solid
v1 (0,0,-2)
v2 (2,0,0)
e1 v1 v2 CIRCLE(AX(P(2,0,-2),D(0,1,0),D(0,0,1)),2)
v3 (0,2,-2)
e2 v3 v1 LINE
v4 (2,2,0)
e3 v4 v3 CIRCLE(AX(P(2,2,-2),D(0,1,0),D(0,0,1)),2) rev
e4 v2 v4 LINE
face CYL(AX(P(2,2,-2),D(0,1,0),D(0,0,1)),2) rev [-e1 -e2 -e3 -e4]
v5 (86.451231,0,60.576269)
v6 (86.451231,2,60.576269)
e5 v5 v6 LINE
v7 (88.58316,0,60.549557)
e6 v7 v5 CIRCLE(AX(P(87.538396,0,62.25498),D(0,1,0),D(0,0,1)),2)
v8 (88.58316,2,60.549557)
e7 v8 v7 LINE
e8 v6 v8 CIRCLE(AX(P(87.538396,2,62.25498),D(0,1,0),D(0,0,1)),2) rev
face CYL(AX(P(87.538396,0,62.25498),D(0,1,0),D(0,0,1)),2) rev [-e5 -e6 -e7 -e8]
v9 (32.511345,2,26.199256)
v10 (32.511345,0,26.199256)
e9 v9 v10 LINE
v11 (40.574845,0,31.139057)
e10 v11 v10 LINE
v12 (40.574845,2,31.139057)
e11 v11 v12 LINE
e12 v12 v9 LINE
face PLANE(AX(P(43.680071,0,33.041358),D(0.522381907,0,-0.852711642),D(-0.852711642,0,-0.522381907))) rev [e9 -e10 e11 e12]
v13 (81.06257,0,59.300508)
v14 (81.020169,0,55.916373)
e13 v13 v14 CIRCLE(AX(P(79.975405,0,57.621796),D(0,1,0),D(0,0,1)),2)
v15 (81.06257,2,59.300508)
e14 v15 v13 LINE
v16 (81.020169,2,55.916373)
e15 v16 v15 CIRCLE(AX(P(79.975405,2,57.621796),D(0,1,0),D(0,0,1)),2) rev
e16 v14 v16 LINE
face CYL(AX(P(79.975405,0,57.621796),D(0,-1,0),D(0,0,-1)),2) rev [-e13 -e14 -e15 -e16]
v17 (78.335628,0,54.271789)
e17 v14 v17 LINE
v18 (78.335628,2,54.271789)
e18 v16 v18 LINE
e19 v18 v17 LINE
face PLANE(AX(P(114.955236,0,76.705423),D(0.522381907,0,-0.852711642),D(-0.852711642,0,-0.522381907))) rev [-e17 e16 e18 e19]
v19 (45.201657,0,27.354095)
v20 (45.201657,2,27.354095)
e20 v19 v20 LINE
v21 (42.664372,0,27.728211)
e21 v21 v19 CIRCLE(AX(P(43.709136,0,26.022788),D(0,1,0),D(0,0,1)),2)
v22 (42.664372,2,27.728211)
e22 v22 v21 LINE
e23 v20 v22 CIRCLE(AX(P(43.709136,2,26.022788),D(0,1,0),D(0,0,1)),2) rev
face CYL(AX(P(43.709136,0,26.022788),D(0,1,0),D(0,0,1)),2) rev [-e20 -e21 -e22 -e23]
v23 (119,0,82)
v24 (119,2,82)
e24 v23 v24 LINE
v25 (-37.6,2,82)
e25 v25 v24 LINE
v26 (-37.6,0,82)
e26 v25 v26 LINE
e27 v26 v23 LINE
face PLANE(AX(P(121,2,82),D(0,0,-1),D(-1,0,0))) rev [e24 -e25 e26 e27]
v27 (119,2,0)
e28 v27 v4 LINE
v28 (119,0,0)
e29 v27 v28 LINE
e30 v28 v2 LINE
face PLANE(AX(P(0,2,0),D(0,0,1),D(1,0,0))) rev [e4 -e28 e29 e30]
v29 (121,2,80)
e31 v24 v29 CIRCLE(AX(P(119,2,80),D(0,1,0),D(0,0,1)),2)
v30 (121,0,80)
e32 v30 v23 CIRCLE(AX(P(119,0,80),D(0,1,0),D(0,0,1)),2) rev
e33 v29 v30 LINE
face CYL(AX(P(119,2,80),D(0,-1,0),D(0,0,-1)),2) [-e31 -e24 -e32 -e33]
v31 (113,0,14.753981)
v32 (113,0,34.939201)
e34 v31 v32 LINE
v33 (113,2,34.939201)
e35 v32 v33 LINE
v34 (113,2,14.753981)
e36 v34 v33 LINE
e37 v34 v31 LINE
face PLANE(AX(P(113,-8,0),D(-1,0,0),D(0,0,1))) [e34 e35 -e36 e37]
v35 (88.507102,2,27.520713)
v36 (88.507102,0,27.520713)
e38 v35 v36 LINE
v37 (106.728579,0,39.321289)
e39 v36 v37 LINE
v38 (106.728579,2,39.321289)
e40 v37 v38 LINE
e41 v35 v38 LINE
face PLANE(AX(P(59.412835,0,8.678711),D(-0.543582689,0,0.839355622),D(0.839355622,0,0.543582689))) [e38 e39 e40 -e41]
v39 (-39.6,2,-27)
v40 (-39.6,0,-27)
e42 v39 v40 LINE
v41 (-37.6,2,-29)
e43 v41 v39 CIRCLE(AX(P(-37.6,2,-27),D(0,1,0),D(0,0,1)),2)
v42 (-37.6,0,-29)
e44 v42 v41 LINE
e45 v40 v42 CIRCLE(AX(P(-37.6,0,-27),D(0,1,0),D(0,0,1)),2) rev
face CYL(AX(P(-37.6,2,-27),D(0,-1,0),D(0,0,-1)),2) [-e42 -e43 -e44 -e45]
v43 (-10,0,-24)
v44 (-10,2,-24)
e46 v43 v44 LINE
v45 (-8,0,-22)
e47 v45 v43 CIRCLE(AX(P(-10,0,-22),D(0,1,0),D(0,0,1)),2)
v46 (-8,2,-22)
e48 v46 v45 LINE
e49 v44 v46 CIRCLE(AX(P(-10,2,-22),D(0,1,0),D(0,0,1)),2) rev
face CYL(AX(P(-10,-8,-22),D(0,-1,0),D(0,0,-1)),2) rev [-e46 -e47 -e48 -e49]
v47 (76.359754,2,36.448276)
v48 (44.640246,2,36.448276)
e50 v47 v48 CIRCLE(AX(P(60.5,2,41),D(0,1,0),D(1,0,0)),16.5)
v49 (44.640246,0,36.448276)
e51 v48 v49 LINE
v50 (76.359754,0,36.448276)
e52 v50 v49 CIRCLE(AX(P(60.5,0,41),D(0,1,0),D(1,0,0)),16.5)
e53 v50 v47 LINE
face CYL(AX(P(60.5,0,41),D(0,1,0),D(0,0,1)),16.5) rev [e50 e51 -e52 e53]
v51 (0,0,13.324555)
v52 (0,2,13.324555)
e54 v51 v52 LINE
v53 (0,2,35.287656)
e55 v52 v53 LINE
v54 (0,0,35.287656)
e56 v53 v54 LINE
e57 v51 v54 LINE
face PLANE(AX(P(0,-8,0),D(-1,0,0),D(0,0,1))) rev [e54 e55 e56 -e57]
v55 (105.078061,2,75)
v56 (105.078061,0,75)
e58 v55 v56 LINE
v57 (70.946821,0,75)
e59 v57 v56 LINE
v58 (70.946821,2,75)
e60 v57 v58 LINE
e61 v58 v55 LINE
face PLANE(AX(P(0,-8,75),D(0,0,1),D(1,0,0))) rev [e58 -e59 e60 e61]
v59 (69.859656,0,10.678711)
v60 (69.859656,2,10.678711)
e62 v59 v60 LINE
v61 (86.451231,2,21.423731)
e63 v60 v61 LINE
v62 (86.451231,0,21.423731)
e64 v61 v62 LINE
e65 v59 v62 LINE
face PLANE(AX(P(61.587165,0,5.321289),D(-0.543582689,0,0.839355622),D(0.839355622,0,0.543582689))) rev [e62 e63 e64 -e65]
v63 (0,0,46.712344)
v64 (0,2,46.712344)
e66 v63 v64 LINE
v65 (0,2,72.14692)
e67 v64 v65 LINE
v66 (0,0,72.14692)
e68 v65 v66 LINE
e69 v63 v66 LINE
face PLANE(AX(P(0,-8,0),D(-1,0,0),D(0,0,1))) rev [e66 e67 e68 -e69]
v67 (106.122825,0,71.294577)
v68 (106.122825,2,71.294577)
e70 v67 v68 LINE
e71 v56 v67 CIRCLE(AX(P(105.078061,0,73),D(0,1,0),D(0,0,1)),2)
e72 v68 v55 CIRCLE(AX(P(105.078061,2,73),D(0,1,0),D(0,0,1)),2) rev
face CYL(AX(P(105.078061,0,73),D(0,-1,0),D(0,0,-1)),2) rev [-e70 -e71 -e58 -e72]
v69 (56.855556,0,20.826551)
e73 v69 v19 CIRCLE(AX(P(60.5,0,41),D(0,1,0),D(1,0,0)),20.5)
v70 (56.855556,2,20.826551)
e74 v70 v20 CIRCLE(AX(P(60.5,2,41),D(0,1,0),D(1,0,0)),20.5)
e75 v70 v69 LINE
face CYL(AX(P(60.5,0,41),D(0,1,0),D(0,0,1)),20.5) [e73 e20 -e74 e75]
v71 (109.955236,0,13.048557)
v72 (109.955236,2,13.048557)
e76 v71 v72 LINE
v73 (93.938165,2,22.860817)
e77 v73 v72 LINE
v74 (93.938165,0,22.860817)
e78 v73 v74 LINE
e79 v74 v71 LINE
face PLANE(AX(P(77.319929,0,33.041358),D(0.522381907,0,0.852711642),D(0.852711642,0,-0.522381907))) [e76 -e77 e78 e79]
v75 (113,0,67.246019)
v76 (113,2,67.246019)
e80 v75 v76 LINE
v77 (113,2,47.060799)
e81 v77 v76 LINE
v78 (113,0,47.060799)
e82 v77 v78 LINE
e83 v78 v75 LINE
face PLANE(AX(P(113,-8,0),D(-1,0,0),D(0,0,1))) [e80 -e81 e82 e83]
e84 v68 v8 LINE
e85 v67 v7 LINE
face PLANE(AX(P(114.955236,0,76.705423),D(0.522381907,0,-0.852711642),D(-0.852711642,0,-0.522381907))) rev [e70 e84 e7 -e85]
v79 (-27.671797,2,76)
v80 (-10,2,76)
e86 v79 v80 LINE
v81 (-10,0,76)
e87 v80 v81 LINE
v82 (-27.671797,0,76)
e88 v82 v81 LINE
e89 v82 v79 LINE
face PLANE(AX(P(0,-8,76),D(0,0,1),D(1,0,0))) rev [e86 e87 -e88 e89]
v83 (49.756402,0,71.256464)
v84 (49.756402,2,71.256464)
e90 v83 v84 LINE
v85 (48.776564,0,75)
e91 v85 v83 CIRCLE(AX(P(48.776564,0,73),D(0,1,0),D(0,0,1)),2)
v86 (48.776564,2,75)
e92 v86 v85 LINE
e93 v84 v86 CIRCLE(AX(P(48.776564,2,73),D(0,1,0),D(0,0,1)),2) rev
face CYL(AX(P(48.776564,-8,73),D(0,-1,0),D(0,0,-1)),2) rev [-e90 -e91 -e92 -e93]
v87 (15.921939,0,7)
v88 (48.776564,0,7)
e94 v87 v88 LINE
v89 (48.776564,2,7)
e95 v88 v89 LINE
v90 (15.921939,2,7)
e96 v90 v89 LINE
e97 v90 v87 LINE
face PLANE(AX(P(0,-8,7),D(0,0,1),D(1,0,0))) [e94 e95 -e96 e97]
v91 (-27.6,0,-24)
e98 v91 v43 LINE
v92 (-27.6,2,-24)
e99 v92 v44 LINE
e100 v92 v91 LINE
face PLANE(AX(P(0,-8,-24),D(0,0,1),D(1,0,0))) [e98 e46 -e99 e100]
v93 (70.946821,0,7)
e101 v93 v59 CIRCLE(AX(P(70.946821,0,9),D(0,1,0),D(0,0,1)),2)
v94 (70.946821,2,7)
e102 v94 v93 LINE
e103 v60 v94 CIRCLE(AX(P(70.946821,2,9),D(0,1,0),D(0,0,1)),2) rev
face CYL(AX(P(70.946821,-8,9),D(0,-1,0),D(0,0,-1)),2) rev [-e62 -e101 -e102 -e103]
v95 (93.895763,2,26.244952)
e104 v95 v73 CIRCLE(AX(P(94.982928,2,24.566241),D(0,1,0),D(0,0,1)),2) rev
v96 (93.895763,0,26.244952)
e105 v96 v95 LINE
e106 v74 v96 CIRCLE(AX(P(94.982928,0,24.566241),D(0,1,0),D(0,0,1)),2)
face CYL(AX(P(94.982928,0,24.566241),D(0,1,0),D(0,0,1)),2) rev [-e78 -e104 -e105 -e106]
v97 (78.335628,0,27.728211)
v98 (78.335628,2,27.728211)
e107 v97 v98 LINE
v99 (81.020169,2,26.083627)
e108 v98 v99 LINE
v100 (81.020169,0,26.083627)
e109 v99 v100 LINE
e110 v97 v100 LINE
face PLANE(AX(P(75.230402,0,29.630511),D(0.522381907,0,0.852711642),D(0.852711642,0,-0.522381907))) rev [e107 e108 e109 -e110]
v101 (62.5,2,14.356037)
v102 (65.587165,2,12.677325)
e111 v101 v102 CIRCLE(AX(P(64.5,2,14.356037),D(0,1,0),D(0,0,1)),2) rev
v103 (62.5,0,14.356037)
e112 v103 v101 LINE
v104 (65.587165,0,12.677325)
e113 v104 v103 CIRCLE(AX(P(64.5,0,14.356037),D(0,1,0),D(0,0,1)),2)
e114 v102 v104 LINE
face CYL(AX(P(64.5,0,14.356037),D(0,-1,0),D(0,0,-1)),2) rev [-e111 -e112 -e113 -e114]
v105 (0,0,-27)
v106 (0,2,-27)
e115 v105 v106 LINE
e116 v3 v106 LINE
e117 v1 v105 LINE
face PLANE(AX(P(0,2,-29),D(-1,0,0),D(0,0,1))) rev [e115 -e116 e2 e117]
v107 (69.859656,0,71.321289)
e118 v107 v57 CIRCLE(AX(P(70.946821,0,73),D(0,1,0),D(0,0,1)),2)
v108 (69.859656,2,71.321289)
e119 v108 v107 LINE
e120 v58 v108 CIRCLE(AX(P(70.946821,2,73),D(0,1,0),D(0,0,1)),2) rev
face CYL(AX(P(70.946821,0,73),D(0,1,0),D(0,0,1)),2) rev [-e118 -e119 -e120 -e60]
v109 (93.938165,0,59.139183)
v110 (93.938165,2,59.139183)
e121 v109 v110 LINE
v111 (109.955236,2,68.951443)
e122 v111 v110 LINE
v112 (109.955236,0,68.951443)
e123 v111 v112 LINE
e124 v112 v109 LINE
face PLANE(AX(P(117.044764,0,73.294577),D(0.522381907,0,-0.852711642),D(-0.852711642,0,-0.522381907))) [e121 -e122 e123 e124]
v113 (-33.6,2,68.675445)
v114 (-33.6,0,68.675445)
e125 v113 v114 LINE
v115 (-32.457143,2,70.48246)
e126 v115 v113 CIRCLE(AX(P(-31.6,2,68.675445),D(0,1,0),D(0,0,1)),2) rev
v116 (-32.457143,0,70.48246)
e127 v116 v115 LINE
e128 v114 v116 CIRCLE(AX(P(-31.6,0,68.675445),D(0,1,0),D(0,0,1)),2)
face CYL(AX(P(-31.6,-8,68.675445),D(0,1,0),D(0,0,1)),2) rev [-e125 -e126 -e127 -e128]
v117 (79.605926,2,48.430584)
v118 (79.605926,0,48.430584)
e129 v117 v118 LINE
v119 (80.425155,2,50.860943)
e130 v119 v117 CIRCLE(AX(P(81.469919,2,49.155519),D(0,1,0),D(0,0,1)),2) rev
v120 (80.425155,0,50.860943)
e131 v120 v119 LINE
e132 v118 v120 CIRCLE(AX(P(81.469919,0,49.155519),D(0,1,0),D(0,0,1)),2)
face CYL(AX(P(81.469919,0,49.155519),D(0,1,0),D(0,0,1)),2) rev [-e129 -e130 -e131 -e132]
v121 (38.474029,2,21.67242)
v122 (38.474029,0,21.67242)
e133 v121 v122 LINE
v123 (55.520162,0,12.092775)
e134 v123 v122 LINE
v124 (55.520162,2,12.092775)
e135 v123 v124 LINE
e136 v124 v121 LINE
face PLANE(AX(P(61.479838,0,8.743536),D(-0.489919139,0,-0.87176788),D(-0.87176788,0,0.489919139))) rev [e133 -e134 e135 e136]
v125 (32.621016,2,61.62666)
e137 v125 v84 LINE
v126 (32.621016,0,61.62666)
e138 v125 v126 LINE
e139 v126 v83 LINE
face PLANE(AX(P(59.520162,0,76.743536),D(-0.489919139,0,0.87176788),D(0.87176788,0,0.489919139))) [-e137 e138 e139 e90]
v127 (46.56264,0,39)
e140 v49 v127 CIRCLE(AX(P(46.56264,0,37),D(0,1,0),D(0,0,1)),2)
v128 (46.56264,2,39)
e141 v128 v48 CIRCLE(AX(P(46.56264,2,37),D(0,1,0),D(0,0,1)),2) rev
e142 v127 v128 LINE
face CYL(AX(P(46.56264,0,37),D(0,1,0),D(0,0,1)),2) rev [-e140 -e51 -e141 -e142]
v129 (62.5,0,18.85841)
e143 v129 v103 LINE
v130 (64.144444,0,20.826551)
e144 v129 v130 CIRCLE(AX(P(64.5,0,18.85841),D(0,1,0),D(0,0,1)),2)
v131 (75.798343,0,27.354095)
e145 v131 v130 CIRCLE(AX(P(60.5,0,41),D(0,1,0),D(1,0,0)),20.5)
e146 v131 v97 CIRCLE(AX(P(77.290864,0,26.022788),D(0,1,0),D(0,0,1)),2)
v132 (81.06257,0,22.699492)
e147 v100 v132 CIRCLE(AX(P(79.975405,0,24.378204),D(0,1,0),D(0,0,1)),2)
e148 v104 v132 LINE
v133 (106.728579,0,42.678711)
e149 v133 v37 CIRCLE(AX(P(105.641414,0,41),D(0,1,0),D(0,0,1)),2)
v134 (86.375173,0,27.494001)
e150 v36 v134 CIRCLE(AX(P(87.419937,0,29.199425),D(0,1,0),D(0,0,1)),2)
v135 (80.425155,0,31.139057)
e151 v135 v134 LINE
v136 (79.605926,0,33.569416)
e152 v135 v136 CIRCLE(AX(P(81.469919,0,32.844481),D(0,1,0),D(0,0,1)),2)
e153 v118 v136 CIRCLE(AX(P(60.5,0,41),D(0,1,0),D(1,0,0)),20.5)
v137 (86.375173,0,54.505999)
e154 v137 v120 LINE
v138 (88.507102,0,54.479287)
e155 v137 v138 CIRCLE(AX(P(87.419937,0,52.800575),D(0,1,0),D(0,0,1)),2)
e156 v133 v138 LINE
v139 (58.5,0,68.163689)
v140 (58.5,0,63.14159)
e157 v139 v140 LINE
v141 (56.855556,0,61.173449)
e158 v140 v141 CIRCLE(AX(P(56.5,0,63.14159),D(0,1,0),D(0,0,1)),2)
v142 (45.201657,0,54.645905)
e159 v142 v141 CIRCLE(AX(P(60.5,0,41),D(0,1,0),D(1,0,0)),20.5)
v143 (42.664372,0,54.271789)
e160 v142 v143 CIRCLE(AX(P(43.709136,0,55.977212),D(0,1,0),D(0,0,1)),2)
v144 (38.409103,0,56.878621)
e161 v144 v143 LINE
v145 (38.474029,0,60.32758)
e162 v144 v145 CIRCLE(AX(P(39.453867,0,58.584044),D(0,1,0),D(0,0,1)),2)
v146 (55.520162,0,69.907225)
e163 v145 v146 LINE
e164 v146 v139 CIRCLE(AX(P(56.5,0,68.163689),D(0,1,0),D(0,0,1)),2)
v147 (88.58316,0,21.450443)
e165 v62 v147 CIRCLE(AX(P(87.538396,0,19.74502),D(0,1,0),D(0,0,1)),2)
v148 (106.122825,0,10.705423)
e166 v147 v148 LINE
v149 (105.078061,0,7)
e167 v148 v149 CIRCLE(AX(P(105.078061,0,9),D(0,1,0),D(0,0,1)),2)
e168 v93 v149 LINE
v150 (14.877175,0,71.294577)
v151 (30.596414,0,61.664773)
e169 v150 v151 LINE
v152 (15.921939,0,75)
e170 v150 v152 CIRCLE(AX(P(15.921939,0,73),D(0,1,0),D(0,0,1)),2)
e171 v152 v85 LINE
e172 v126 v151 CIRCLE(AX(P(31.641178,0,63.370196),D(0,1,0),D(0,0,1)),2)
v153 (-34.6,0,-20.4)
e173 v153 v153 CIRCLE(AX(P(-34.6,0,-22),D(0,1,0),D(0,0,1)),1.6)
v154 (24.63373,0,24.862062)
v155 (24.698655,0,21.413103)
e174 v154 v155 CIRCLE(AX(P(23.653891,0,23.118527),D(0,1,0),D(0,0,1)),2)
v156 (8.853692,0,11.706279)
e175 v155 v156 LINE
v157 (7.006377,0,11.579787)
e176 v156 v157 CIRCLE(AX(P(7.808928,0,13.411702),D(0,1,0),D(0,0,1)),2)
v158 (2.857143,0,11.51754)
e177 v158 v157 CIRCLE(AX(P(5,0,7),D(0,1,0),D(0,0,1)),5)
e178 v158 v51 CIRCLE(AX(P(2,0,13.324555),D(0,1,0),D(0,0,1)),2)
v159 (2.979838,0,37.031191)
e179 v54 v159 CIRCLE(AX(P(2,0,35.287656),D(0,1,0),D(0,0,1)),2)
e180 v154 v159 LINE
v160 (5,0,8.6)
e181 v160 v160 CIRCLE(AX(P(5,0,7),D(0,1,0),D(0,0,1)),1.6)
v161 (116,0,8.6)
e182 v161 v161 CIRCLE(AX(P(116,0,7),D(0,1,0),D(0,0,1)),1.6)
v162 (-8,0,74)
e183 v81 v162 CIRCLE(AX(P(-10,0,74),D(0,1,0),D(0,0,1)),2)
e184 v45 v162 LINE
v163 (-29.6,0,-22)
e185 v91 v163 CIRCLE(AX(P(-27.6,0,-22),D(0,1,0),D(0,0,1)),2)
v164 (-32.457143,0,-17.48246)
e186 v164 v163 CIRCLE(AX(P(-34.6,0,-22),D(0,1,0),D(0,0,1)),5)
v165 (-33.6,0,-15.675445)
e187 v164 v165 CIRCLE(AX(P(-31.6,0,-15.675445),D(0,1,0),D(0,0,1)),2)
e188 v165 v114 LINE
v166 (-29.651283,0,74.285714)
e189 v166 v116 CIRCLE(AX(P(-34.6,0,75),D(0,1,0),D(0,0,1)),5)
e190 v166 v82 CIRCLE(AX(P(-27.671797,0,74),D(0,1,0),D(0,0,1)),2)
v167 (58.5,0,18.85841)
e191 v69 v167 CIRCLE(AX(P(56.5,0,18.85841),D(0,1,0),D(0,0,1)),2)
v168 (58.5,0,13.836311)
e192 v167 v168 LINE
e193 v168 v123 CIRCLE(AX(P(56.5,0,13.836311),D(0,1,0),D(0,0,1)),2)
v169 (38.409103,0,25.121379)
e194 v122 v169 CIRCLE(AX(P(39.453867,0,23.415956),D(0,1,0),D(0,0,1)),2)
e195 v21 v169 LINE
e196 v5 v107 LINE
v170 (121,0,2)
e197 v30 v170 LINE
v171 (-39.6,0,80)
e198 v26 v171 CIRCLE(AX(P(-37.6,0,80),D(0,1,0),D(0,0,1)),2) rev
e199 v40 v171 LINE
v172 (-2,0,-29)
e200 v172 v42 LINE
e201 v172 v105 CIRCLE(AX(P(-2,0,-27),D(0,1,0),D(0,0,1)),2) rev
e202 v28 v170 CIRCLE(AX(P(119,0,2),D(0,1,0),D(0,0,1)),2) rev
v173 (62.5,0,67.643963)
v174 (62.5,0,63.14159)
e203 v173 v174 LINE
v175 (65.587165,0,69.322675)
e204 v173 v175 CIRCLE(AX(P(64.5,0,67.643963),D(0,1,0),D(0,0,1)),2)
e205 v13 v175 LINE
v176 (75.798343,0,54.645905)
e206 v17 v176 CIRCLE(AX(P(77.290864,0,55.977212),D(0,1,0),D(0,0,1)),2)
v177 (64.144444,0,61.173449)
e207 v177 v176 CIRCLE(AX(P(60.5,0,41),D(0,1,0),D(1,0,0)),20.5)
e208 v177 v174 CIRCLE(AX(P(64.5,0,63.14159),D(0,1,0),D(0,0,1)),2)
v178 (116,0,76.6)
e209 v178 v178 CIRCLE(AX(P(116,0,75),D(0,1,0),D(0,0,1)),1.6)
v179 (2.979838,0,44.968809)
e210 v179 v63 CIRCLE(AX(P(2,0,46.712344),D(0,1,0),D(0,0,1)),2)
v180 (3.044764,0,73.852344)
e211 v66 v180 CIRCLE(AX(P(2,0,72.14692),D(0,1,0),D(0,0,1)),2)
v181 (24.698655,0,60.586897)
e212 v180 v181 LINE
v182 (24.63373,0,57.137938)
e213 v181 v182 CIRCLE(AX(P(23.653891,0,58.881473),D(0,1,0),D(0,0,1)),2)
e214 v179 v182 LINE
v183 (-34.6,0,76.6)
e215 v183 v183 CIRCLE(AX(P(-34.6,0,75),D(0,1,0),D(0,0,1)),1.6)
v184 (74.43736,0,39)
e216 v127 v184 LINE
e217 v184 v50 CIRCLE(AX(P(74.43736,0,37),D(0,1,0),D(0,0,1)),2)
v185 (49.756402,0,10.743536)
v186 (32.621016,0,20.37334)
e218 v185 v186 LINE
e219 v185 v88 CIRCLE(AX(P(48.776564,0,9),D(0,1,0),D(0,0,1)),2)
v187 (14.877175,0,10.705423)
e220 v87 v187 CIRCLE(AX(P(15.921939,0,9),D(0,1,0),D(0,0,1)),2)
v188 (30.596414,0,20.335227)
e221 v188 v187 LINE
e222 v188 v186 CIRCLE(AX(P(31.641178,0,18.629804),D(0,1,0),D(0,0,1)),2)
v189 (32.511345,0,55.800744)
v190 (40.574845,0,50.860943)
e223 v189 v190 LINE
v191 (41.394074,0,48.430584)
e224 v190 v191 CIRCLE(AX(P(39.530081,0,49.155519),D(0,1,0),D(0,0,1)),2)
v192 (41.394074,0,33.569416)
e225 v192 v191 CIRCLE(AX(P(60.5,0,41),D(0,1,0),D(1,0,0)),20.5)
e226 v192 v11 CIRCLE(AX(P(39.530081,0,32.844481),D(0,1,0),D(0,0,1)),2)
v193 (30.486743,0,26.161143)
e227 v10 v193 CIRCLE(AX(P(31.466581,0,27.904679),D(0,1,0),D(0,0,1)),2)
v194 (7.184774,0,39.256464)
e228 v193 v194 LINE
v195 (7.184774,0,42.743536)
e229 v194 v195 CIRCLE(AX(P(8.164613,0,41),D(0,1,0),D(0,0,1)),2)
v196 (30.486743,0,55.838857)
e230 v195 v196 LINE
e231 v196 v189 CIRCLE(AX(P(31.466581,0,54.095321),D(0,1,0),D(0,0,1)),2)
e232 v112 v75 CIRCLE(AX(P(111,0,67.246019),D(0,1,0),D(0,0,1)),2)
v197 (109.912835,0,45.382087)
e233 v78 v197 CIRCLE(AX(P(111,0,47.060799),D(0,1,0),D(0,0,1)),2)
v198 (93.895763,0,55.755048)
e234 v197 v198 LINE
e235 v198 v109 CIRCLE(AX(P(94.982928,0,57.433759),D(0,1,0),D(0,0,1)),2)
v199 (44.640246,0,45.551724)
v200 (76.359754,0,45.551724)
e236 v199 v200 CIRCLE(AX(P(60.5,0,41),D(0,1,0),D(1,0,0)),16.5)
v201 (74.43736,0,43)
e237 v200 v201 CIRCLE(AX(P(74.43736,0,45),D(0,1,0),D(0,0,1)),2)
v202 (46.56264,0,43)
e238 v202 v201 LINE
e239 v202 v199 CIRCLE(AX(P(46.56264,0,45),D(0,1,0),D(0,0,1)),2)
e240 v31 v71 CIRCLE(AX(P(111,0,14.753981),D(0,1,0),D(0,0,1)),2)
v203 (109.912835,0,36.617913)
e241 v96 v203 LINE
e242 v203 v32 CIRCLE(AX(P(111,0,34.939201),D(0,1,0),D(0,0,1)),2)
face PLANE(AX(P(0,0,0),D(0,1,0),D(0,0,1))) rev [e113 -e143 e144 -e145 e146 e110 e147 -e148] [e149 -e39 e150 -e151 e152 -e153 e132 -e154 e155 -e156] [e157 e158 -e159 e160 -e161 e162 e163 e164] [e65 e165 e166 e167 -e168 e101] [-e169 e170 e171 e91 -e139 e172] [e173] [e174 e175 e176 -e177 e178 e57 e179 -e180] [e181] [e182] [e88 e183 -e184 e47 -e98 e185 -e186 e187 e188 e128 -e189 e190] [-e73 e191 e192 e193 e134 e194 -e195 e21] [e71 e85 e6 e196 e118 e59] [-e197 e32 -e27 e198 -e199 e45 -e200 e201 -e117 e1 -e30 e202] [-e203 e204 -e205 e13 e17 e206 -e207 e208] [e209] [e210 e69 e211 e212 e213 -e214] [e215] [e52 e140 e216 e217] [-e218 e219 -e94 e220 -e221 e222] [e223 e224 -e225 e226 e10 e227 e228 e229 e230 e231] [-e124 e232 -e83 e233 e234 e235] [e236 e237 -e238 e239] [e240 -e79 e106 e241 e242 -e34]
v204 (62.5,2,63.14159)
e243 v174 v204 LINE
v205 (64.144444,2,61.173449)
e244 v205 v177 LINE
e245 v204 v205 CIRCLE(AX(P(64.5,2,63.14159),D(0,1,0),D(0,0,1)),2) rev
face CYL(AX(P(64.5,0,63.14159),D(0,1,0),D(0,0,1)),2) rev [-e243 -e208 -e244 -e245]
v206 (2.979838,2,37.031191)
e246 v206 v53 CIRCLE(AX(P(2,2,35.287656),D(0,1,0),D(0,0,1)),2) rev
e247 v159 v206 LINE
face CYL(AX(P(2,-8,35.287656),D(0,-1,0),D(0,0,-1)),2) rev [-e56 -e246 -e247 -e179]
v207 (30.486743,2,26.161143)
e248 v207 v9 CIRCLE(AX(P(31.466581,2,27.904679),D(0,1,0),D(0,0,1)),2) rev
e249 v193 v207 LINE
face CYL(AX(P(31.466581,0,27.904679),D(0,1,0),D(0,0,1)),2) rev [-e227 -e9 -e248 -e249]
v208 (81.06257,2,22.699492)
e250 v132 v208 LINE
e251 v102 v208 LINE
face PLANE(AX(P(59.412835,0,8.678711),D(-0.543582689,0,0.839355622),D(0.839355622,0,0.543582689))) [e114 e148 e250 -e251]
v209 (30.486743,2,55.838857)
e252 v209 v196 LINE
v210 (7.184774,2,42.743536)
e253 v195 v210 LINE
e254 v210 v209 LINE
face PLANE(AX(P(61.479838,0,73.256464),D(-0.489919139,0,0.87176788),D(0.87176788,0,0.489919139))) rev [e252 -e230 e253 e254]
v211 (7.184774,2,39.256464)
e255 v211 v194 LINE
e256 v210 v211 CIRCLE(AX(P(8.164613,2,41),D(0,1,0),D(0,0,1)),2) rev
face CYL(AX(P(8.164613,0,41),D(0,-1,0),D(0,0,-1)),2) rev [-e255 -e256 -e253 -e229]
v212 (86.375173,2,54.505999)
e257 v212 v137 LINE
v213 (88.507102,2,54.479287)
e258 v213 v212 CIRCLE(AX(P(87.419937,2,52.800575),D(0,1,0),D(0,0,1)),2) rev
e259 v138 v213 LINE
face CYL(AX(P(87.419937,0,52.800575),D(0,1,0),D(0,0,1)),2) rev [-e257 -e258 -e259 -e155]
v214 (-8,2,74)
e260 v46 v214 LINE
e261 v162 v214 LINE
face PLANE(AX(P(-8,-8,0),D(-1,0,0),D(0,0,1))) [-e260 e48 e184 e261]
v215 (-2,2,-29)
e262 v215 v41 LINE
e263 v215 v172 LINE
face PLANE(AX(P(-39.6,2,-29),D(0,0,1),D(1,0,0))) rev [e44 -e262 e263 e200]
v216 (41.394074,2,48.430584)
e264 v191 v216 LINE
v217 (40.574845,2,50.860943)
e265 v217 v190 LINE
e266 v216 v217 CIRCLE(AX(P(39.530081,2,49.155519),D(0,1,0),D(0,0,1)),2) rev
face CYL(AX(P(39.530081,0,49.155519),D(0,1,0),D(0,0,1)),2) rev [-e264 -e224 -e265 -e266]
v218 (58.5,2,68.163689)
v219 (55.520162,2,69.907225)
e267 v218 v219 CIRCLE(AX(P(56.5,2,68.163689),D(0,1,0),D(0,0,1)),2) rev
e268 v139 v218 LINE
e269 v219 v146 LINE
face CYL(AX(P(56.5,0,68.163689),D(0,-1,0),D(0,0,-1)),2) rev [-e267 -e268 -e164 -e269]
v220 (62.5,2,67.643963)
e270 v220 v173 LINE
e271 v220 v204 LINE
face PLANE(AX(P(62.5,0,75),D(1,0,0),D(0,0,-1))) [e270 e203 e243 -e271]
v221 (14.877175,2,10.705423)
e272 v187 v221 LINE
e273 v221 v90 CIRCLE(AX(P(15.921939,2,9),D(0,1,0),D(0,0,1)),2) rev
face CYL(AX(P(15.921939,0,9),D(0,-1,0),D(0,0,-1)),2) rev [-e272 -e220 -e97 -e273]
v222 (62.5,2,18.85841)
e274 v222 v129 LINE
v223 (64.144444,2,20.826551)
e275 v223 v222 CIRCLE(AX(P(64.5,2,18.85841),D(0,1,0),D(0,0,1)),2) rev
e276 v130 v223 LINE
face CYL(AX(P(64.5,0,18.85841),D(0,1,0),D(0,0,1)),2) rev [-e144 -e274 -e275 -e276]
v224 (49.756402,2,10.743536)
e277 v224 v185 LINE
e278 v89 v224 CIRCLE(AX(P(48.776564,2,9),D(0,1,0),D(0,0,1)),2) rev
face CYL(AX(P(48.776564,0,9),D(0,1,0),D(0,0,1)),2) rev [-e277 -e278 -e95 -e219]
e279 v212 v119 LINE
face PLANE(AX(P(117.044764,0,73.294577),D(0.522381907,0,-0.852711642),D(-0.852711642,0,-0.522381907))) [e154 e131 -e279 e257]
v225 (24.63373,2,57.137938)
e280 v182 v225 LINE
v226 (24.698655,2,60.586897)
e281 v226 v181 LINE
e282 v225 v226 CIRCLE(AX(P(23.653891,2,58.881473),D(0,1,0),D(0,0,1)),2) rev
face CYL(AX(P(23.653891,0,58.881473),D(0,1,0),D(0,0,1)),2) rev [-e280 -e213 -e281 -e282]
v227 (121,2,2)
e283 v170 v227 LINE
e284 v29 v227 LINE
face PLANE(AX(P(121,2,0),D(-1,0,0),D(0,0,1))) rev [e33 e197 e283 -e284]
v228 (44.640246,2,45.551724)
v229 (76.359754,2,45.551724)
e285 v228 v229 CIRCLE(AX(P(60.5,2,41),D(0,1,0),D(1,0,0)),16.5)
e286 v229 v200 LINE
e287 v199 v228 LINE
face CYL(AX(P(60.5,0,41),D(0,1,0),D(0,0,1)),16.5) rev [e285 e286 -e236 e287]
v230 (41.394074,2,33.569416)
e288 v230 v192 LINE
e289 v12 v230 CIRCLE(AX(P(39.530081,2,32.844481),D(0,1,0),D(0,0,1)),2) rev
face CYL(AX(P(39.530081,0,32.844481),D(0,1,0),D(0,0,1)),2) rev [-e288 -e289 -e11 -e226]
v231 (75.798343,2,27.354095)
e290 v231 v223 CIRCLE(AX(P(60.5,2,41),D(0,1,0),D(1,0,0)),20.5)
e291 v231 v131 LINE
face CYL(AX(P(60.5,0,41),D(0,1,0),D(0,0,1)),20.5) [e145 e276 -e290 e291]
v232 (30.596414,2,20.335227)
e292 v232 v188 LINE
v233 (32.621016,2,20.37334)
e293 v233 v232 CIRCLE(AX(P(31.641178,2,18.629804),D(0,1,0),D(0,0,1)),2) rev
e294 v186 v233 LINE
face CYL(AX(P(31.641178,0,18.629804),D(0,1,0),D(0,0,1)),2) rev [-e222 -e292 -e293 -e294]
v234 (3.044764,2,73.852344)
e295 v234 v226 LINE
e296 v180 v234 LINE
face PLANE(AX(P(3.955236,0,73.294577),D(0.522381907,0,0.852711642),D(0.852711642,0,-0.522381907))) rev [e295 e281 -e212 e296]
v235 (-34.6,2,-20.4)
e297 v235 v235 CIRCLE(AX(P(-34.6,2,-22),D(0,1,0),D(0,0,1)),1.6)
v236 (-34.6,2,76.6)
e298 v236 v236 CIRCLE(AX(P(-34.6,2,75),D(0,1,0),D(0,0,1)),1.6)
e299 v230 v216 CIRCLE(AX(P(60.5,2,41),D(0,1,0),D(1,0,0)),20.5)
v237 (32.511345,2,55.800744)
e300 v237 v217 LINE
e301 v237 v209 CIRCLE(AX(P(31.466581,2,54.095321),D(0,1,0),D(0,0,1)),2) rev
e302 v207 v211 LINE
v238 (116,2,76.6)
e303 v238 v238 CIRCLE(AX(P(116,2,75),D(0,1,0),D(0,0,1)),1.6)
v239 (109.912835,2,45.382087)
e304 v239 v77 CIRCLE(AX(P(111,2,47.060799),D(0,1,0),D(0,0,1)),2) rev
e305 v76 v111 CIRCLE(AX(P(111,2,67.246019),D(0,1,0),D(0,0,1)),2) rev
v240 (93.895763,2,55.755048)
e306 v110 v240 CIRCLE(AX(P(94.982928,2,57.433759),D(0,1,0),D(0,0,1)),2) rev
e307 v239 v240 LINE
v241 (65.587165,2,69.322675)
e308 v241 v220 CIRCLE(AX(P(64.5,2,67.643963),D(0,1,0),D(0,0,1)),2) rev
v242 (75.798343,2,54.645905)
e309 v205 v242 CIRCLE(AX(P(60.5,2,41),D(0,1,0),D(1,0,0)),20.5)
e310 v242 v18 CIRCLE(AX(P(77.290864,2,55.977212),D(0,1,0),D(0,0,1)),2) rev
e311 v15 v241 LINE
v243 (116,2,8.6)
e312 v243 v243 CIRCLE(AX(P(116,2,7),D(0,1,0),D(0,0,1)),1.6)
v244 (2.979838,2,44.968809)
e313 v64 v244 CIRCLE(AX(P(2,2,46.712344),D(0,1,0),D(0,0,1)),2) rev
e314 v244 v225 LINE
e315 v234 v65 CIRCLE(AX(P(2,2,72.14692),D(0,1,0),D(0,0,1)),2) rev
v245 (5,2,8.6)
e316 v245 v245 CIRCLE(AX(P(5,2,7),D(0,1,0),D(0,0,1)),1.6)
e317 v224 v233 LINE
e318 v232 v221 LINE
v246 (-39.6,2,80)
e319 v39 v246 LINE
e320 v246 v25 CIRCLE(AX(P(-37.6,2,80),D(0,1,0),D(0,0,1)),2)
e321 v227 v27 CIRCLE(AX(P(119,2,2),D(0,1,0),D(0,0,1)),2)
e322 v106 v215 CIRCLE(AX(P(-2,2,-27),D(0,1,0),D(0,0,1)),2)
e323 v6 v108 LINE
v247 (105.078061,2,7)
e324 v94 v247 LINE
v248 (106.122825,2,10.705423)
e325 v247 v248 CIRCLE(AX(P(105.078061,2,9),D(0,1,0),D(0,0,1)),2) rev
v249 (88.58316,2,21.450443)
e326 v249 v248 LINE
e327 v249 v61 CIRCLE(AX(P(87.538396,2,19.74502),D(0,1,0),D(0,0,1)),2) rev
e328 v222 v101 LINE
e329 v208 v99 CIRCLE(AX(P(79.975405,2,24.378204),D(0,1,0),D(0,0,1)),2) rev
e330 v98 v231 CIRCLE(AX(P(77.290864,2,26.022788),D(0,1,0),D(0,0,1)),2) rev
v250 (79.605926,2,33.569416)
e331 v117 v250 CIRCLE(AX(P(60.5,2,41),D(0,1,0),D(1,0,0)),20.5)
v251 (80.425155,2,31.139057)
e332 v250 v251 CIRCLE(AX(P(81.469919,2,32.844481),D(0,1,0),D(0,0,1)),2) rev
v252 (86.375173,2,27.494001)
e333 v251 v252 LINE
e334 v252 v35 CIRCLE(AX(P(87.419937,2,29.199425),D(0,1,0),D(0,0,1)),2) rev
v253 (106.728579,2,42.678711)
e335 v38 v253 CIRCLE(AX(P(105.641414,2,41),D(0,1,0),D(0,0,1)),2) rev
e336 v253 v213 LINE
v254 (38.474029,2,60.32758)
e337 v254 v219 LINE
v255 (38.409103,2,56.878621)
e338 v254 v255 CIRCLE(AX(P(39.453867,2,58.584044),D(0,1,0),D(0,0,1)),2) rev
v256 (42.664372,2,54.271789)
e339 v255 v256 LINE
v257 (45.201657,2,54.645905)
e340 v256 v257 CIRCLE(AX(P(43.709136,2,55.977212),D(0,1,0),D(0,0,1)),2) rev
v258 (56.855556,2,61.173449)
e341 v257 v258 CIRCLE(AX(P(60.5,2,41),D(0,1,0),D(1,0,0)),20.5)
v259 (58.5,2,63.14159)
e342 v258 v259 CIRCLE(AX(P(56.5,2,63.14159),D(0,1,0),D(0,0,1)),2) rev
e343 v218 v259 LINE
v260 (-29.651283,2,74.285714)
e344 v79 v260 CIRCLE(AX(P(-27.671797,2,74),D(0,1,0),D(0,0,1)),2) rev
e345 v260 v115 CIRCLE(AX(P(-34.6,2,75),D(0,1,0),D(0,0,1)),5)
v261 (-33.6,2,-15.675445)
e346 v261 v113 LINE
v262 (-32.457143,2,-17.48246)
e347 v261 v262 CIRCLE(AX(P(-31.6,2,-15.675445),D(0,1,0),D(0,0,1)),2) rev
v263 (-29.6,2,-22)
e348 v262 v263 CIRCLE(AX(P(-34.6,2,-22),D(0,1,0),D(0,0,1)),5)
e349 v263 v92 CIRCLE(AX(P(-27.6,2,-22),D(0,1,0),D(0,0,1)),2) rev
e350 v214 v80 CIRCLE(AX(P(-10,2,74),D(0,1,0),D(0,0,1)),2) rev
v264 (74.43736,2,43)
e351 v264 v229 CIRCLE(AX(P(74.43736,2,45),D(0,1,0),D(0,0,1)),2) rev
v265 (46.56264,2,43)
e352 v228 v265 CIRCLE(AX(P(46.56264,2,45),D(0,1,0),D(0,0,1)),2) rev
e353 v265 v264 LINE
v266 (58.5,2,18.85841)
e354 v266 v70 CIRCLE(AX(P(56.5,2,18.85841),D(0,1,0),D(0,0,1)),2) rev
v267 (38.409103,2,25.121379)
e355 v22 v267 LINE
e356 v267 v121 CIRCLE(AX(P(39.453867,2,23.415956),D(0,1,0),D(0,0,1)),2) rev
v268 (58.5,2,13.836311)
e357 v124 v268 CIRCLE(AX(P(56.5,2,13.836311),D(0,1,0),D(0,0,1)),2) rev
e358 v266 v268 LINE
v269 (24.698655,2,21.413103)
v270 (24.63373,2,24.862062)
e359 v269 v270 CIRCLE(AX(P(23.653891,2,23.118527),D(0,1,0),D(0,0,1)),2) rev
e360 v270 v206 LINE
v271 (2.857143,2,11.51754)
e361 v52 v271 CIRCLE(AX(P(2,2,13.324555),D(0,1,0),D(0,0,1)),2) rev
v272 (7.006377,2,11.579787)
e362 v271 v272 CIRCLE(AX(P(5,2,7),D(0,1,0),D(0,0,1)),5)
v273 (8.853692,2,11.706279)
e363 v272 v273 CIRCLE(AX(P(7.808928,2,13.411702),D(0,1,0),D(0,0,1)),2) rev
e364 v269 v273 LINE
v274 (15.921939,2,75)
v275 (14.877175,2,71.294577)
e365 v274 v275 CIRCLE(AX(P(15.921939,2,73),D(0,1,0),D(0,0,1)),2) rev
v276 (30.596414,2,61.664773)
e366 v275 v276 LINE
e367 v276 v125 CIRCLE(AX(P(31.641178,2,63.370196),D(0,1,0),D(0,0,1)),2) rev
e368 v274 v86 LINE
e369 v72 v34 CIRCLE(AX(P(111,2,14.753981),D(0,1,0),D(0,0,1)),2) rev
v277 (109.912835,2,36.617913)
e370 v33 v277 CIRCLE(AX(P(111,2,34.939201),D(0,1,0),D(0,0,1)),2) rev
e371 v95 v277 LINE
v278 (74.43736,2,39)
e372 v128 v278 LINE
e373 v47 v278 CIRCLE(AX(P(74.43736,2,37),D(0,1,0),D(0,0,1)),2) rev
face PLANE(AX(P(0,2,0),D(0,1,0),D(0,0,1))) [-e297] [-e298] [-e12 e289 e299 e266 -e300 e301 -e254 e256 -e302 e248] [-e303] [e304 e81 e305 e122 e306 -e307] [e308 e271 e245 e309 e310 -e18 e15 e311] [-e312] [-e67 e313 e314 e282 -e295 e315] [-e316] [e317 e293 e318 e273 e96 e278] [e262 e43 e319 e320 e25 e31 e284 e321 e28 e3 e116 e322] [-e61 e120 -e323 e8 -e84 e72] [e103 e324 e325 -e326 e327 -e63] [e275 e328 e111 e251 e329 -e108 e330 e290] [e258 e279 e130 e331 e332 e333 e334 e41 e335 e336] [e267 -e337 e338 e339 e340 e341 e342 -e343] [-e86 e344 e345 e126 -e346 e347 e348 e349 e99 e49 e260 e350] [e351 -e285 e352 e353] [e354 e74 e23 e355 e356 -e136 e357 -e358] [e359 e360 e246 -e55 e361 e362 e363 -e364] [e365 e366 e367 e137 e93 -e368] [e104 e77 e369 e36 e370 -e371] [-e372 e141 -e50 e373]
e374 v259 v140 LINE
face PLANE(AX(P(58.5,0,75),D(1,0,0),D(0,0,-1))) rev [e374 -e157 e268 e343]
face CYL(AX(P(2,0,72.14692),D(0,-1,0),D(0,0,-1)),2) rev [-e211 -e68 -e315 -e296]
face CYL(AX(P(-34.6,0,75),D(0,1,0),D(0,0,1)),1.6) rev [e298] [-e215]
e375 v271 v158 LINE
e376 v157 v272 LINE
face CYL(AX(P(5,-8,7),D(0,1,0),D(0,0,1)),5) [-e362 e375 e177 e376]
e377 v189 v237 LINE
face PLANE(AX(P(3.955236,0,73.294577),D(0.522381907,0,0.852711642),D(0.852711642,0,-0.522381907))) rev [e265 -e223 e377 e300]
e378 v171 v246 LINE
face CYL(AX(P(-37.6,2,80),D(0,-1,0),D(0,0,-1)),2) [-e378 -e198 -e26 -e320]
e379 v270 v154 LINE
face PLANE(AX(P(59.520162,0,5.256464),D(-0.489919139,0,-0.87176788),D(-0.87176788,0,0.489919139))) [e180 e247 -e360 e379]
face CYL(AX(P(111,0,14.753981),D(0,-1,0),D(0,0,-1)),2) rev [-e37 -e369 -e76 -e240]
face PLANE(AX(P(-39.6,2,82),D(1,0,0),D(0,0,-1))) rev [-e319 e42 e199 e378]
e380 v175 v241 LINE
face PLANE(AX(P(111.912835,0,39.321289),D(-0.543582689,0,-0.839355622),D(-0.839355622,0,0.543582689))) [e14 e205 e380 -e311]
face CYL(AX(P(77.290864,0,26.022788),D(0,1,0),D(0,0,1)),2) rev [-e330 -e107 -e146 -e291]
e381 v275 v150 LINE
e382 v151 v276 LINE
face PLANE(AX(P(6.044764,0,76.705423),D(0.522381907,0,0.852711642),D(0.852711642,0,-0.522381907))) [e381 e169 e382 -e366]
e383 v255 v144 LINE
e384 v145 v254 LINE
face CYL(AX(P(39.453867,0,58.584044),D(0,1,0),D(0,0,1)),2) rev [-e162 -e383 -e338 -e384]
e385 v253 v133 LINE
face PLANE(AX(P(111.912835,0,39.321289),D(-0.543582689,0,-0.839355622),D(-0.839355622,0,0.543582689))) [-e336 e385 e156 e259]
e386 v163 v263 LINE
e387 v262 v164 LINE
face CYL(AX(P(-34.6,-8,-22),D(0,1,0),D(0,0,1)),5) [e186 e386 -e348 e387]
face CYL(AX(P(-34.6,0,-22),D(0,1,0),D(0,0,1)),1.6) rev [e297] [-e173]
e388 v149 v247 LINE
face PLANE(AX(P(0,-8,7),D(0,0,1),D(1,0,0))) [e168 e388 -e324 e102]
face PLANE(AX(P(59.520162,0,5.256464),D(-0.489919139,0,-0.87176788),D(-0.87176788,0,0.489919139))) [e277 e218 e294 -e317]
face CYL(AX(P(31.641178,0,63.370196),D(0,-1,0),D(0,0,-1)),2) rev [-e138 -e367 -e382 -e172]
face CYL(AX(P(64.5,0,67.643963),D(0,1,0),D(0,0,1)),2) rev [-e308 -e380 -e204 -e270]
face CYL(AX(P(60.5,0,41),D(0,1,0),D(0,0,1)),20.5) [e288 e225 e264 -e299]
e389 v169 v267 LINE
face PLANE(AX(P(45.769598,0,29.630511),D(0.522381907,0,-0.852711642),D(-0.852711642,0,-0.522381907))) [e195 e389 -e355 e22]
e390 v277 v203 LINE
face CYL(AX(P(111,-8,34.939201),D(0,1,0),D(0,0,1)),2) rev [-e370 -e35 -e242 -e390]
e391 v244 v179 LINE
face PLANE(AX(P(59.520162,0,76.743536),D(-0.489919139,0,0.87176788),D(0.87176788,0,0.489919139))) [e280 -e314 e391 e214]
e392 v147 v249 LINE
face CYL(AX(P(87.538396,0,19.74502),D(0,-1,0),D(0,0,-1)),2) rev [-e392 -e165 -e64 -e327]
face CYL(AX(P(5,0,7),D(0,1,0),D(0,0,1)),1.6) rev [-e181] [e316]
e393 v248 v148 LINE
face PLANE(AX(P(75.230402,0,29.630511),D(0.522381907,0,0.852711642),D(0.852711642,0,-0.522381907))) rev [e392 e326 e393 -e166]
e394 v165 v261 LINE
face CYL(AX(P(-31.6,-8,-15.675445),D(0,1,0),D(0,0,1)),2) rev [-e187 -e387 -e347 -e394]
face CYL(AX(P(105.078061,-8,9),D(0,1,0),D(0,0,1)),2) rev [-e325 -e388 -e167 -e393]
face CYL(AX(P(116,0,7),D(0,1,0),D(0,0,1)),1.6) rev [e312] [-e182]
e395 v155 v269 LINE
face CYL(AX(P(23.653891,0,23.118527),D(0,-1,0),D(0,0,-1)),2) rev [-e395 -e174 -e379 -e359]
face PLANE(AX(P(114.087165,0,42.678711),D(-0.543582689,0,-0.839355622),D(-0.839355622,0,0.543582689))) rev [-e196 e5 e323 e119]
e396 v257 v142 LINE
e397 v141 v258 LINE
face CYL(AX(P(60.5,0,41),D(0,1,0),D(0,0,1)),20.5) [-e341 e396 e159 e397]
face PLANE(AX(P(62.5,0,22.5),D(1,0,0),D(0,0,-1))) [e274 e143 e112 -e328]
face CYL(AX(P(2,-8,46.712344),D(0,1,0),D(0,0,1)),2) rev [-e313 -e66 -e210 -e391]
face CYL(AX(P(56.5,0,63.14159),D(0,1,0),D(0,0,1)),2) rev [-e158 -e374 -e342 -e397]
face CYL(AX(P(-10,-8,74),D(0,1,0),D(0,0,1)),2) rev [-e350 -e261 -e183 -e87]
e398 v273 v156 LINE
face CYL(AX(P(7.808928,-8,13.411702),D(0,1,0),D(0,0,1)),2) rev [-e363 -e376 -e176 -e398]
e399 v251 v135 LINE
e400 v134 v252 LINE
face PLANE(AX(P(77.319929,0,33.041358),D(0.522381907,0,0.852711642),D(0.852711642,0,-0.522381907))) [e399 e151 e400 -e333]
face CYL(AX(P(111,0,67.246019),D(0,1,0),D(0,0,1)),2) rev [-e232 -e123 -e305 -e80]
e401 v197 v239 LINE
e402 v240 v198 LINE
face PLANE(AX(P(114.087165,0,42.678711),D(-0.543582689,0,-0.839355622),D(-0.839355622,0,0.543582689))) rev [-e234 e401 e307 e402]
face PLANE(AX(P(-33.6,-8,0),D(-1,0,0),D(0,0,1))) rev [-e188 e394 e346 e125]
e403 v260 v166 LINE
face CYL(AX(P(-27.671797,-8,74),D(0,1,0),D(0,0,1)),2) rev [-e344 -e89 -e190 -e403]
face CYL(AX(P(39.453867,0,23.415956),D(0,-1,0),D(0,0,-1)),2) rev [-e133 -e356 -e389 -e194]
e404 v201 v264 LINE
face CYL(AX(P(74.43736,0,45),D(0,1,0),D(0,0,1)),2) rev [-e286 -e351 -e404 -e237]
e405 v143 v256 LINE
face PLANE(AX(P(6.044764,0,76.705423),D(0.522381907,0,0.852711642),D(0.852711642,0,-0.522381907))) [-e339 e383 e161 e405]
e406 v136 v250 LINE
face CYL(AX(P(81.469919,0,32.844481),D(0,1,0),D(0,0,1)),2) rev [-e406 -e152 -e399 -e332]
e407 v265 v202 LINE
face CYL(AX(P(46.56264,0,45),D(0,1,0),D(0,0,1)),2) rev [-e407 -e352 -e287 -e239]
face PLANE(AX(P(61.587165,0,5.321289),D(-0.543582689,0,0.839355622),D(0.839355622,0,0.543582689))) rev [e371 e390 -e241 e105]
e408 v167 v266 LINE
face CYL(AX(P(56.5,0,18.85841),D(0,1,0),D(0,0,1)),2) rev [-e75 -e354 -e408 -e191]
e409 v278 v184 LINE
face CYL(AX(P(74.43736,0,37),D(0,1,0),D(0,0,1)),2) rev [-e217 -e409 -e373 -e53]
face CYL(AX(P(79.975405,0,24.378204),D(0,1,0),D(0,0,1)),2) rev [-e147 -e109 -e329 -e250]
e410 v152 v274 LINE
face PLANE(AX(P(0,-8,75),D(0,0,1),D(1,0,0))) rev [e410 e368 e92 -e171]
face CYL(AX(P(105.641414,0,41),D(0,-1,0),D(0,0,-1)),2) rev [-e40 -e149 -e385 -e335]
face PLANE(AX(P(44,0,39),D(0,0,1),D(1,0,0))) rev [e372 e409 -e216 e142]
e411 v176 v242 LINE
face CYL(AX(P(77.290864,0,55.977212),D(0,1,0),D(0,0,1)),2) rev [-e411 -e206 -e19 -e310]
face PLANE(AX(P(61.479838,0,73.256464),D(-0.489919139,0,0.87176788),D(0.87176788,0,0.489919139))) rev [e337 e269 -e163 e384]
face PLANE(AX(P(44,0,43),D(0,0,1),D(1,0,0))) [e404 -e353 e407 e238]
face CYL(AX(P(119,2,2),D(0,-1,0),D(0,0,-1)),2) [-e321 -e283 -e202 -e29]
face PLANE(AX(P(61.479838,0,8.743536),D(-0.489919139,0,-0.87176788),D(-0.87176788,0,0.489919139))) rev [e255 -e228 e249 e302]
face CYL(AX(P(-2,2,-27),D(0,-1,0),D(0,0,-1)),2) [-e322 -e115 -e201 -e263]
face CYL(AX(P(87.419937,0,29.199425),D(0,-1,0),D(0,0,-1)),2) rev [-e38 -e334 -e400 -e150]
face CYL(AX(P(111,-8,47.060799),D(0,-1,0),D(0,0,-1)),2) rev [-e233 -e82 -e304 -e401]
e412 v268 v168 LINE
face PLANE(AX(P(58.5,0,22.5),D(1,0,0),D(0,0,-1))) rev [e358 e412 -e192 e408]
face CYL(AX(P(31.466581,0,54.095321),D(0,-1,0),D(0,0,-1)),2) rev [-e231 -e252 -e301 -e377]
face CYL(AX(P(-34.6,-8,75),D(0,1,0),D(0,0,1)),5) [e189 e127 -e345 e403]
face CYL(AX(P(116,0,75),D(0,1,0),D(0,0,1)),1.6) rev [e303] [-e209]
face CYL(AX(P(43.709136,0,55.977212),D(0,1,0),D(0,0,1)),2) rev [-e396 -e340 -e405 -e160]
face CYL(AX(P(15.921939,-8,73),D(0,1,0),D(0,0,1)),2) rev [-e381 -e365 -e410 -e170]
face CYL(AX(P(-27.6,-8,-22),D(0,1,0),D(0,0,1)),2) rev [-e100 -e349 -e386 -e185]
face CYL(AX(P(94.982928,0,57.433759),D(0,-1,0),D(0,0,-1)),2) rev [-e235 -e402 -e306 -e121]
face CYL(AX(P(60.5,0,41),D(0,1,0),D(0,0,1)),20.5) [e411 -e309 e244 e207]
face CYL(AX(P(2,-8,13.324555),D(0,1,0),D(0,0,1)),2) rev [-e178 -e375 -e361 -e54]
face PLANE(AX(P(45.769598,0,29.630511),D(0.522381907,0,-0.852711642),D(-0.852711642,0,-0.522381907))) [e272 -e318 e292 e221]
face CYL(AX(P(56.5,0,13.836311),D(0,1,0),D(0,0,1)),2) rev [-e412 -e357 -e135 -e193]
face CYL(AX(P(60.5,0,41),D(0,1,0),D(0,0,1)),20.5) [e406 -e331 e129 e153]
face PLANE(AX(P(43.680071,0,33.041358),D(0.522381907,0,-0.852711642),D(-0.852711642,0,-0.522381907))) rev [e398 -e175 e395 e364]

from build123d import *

# Parameters (mm, degrees)
EXTRUDE_1_DEPTH       = 2
SKETCH_2_R            = 1.6
CUT_EXTRUDE_1_DEPTH   = 2
CUT_EXTRUDE_2_DEPTH   = 10
EXTRUDE_START         = -2
EXTRUDE_1_2_OUTLINE_R = 16.5
EXTRUDE_1_2_DEPTH     = 2
SKETCH_5_R            = 1.6
CUT_EXTRUDE_3_DEPTH   = 2
FILLET_1_R            = 2
FILLET_2_R            = 2
SKETCH_6_W            = 33
SKETCH_6_H            = 4
EXTRUDE_2_DEPTH       = 2
FILLET_3_R            = 2


# Read off the part's stored shape, not the designer's step: 拉伸-薄壁1
with BuildPart() as part:
    # 草图1 → Extrude 1 (new body)
    with BuildSketch(Plane(origin=(0, 0, 0), x_dir=(1, 0, 0), z_dir=(0, 1, 0))):
        Polygon((0, 0), (121, 0), (121, -82), (-39.6, -82), (-39.6, 29), (0, 29), align=None)
    extrude(amount=EXTRUDE_1_DEPTH)

    # 草图2 → 切除-拉伸1 (cut)
    with BuildSketch(Plane(origin=(0, 2, 0), x_dir=(1, 0, 0), z_dir=(0, 1, 0))):
        with Locations(Location((-34.6, -75, 0), (0, 0, 270))):
            Circle(SKETCH_2_R)
        with Locations(Location((-34.6, 22, 0), (0, 0, 270))):
            Circle(SKETCH_2_R)
        with Locations(Location((116, -75, 0), (0, 0, 270))):
            Circle(SKETCH_2_R)
        with Locations(Location((116, -7, 0), (0, 0, 270))):
            Circle(SKETCH_2_R)
        with Locations(Location((5, -7, 0), (0, 0, 270))):
            Circle(SKETCH_2_R)
    extrude(amount=-CUT_EXTRUDE_1_DEPTH, mode=Mode.SUBTRACT)

    # 草图3 → 切除-拉伸2 (cut)
    with BuildSketch(Plane(origin=(0, 2, 0), x_dir=(1, 0, 0), z_dir=(0, 1, 0))):
        with BuildLine():
            Line((-8, 24), (-30.017424305, 24))
            ThreePointArc((-30.017424305, 24), (-30.162628331, 19.695714283), (-33.6, 17.101020514))
            Line((-33.6, 17.101020514), (-33.6, -70.101020514))
            ThreePointArc((-33.6, -70.101020514), (-30.428791604, -72.243005166), (-29.701020514, -76))
            Line((-29.701020514, -76), (-8, -76))
            Line((-8, -76), (-8, 24))
        make_face()
        with BuildLine():
            ThreePointArc((10, -7), (5, -12), (0, -7))
            Line((0, -7), (0, -75))
            Line((0, -75), (111, -75))
            ThreePointArc((111, -75), (111.527864045, -72.763932023), (113, -71))
            Line((113, -71), (113, -11))
            ThreePointArc((113, -11), (111.527864045, -9.236067977), (111, -7))
            Line((111, -7), (10, -7))
        make_face()
    extrude(amount=-CUT_EXTRUDE_2_DEPTH, mode=Mode.SUBTRACT)

    # Extrude 1 2 outline → Extrude 1 2 (add)
    # profile 1 of 4: a face of its own
    with BuildSketch(Plane(origin=(0, 2, 0), x_dir=(1, 0, 0), z_dir=(0, 1, 0)).offset(EXTRUDE_START)):
        with BuildLine():
            Line((87.508781443, -59.891378935), (111.047620543, -74.311568655))
            ThreePointArc((111.047620543, -74.311568655), (111.692830803, -72.460650968), (113, -71))
            Line((113, -71), (113, -70.81670339))
            Line((113, -70.81670339), (91.231047509, -57.480768531))
            Line((91.231047509, -57.480768531), (113, -43.382780251))
            Line((113, -43.382780251), (113, -38.617219749))
            Line((113, -38.617219749), (91.231047509, -24.519231469))
            Line((91.231047509, -24.519231469), (113, -11.18329661))
            Line((113, -11.18329661), (113, -11))
            ThreePointArc((113, -11), (111.692830803, -9.539349032), (111.047620543, -7.688431345))
            Line((111.047620543, -7.688431345), (87.508781443, -22.108621065))
            Line((87.508781443, -22.108621065), (64.179293034, -7))
            Line((64.179293034, -7), (56.417693677, -7))
            Line((56.417693677, -7), (31.597528439, -20.948522613))
            Line((31.597528439, -20.948522613), (9.952379457, -7.688431345))
            ThreePointArc((9.952379457, -7.688431345), (9.263558208, -9.611909533), (7.86285183, -11.099277912))
            Line((7.86285183, -11.099277912), (27.603885339, -23.192884025))
            Line((27.603885339, -23.192884025), (0, -38.705811323))
            Line((0, -38.705811323), (0, -43.294188677))
            Line((0, -43.294188677), (27.603885339, -58.807115975))
            Line((27.603885339, -58.807115975), (1.171383475, -75))
            Line((1.171383475, -75), (8.828616525, -75))
            Line((8.828616525, -75), (31.597528439, -61.051477387))
            Line((31.597528439, -61.051477387), (56.417693677, -75))
            Line((56.417693677, -75), (64.179293034, -75))
            Line((64.179293034, -75), (87.508781443, -59.891378935))
        make_face()
        with BuildLine():
            Line((35.503873282, -58.658401266), (44.147565445, -53.363166428))
            ThreePointArc((44.147565445, -53.363166428), (50.482041032, -58.885482887), (58.5, -61.402205763))
            Line((58.5, -61.402205763), (58.5, -71.581844381))
            Line((58.5, -71.581844381), (35.503873282, -58.658401266))
        make_face(mode=Mode.SUBTRACT)
        with BuildLine():
            Line((76.852434555, -53.363166428), (83.727285824, -57.574787025))
            Line((83.727285824, -57.574787025), (62.5, -71.321981654))
            Line((62.5, -71.321981654), (62.5, -61.402205763))
            ThreePointArc((62.5, -61.402205763), (70.517958968, -58.885482887), (76.852434555, -53.363166428))
        make_face(mode=Mode.SUBTRACT)
        with BuildLine():
            Line((31.510230182, -25.585960145), (42.058037819, -32.047680139))
            ThreePointArc((42.058037819, -32.047680139), (40, -41), (42.058037819, -49.952319861))
            Line((42.058037819, -49.952319861), (31.510230182, -56.414039855))
            Line((31.510230182, -56.414039855), (4.082306323, -41))
            Line((4.082306323, -41), (31.510230182, -25.585960145))
        make_face(mode=Mode.SUBTRACT)
        with BuildLine():
            Line((58.5, -10.418155619), (58.5, -20.597794237))
            ThreePointArc((58.5, -20.597794237), (50.482041032, -23.114517113), (44.147565445, -28.636833572))
            Line((44.147565445, -28.636833572), (35.503873282, -23.341598734))
            Line((35.503873282, -23.341598734), (58.5, -10.418155619))
        make_face(mode=Mode.SUBTRACT)
        with Locations((60.5, -41)):
            Circle(EXTRUDE_1_2_OUTLINE_R, mode=Mode.SUBTRACT)
        with BuildLine():
            Line((87.449551891, -26.83582338), (109.320706966, -41))
            Line((109.320706966, -41), (87.449551891, -55.16417662))
            Line((87.449551891, -55.16417662), (78.941962181, -49.952319861))
            ThreePointArc((78.941962181, -49.952319861), (81, -41), (78.941962181, -32.047680139))
            Line((78.941962181, -32.047680139), (87.449551891, -26.83582338))
        make_face(mode=Mode.SUBTRACT)
        with BuildLine():
            ThreePointArc((76.852434555, -28.636833572), (70.517958968, -23.114517113), (62.5, -20.597794237))
            Line((62.5, -20.597794237), (62.5, -10.678018346))
            Line((62.5, -10.678018346), (83.727285824, -24.425212975))
            Line((83.727285824, -24.425212975), (76.852434555, -28.636833572))
        make_face(mode=Mode.SUBTRACT)
    # profile 2 of 4: a face of its own
    with BuildSketch(Plane(origin=(0, 2, 0), x_dir=(1, 0, 0), z_dir=(0, 1, 0)).offset(EXTRUDE_START)):
        with BuildLine():
            Line((115.16418895, -76.364338627), (116.83581105, -73.635661373))
            ThreePointArc((116.83581105, -73.635661373), (114.635661373, -74.16418895), (115.16418895, -76.364338627))
        make_face()
    # profile 3 of 4: a face of its own
    with BuildSketch(Plane(origin=(0, 2, 0), x_dir=(1, 0, 0), z_dir=(0, 1, 0)).offset(EXTRUDE_START)):
        with BuildLine():
            Line((116.83581105, -8.364338627), (115.16418895, -5.635661373))
            ThreePointArc((115.16418895, -5.635661373), (114.635661373, -7.83581105), (116.83581105, -8.364338627))
        make_face()
    # profile 4 of 4: a face of its own
    with BuildSketch(Plane(origin=(0, 2, 0), x_dir=(1, 0, 0), z_dir=(0, 1, 0)).offset(EXTRUDE_START)):
        with BuildLine():
            Line((5.83581105, -5.635661373), (4.16418895, -8.364338627))
            ThreePointArc((4.16418895, -8.364338627), (6.364338627, -7.83581105), (5.83581105, -5.635661373))
        make_face()
    extrude(amount=EXTRUDE_1_2_DEPTH)

    # 草图5 → 切除-拉伸3 (cut)
    with BuildSketch(Plane(origin=(0, 2, 0), x_dir=(1, 0, 0), z_dir=(0, 1, 0))):
        with Locations(Location((116, -75, 0), (0, 0, 270))):
            Circle(SKETCH_5_R)
        with Locations(Location((116, -7, 0), (0, 0, 270))):
            Circle(SKETCH_5_R)
        with Locations(Location((5, -7, 0), (0, 0, 270))):
            Circle(SKETCH_5_R)
        Polygon((1.171383475, -75), (0, -75.717604291), (0, -75), align=None)
        Polygon((9.952379457, -7.688431345), (8.828616525, -7), (10, -7), (10.204957063, -7.513689319), align=None)
        Polygon((111, -7), (112.171383475, -7), (111.047620543, -7.688431345), (110.264993828, -7.459277871), align=None)
        Polygon((111.047620543, -74.311568655), (112.171383475, -75), (111, -75), (109.825525136, -74.655784327), align=None)
    extrude(amount=-CUT_EXTRUDE_3_DEPTH, mode=Mode.SUBTRACT)

    # 圆角1
    fillet_1_edges = [part.edges().sort_by_distance(p)[0] for p in [
        (0, 1, 38.705811323),
        (0, 1, 43.294188677),
        (8.828616525, 1, 75),
        (64.179293034, 1, 75),
        (56.417693677, 1, 75),
        (113, 1, 43.382780251),
        (113, 1, 38.617219749),
        (113, 1, 11.18329661),
        (113, 1, 70.81670339),
        (64.179293034, 1, 7),
        (56.417693677, 1, 7),
        (7.86285183, 1, 11.099277912),
        (31.597528439, 1, 61.051477387),
        (27.603885339, 1, 58.807115975),
        (27.603885339, 1, 23.192884025),
        (35.503873282, 1, 58.658401266),
        (35.503873282, 1, 23.341598734),
        (4.082306323, 1, 41),
        (31.597528439, 1, 20.948522613),
        (87.449551891, 1, 55.16417662),
        (109.320706966, 1, 41),
        (91.231047509, 1, 24.519231469),
        (91.231047509, 1, 57.480768531),
        (87.449551891, 1, 26.83582338),
        (78.941962181, 1, 49.952319861),
        (78.941962181, 1, 32.047680139),
        (76.852434555, 1, 53.363166428),
        (76.852434555, 1, 28.636833572),
        (87.508781443, 1, 22.108621065),
        (87.508781443, 1, 59.891378935),
        (62.5, 1, 20.597794237),
        (62.5, 1, 61.402205763),
        (83.727285824, 1, 57.574787025),
        (83.727285824, 1, 24.425212975),
        (44.147565445, 1, 53.363166428),
        (62.5, 1, 71.321981654),
        (58.5, 1, 71.581844381),
        (58.5, 1, 61.402205763),
        (31.510230182, 1, 56.414039855),
        (42.058037819, 1, 49.952319861),
        (44.147565445, 1, 28.636833572),
        (62.5, 1, 10.678018346),
        (58.5, 1, 10.418155619),
        (58.5, 1, 20.597794237),
        (31.510230182, 1, 25.585960145),
        (42.058037819, 1, 32.047680139),
        (0, 1, 75.717604291),
        (112.171383475, 1, 75),
        (112.171383475, 1, 7),
        (8.828616525, 1, 7),
        (-29.701020514, 1, 76),
        (-33.6, 1, 70.101020514),
        (-33.6, 1, -17.101020514),
        (-30.017424305, 1, -24),
        (-8, 1, -24),
        (-8, 1, 76),
        (0, 1, 7),
    ]]
    fillet(fillet_1_edges, radius=FILLET_1_R)

    # 圆角2
    fillet_2_edges = [part.edges().sort_by_distance(p)[0] for p in [
        (0, 1, 0),
        (121, 1, 0),
        (121, 1, 82),
        (-39.6, 1, 82),
        (-39.6, 1, -29),
        (0, 1, -29),
    ]]
    fillet(fillet_2_edges, radius=FILLET_2_R)

    # 草图6 → 拉伸-薄壁2 (add)
    with BuildSketch(Plane(origin=(0, 2, 0), x_dir=(1, 0, 0), z_dir=(0, 1, 0))):
        with Locations((60.5, -41)):
            Rectangle(SKETCH_6_W, SKETCH_6_H)
    extrude(amount=-EXTRUDE_2_DEPTH)

    # 圆角3
    fillet_3_edges = [part.edges().sort_by_distance(p)[0] for p in [
        (44.121660646, 1, 39),
        (76.878339354, 1, 39),
        (44.121660646, 1, 43),
        (76.878339354, 1, 43),
    ]]
    fillet(fillet_3_edges, radius=FILLET_3_R)


solid = part.part
